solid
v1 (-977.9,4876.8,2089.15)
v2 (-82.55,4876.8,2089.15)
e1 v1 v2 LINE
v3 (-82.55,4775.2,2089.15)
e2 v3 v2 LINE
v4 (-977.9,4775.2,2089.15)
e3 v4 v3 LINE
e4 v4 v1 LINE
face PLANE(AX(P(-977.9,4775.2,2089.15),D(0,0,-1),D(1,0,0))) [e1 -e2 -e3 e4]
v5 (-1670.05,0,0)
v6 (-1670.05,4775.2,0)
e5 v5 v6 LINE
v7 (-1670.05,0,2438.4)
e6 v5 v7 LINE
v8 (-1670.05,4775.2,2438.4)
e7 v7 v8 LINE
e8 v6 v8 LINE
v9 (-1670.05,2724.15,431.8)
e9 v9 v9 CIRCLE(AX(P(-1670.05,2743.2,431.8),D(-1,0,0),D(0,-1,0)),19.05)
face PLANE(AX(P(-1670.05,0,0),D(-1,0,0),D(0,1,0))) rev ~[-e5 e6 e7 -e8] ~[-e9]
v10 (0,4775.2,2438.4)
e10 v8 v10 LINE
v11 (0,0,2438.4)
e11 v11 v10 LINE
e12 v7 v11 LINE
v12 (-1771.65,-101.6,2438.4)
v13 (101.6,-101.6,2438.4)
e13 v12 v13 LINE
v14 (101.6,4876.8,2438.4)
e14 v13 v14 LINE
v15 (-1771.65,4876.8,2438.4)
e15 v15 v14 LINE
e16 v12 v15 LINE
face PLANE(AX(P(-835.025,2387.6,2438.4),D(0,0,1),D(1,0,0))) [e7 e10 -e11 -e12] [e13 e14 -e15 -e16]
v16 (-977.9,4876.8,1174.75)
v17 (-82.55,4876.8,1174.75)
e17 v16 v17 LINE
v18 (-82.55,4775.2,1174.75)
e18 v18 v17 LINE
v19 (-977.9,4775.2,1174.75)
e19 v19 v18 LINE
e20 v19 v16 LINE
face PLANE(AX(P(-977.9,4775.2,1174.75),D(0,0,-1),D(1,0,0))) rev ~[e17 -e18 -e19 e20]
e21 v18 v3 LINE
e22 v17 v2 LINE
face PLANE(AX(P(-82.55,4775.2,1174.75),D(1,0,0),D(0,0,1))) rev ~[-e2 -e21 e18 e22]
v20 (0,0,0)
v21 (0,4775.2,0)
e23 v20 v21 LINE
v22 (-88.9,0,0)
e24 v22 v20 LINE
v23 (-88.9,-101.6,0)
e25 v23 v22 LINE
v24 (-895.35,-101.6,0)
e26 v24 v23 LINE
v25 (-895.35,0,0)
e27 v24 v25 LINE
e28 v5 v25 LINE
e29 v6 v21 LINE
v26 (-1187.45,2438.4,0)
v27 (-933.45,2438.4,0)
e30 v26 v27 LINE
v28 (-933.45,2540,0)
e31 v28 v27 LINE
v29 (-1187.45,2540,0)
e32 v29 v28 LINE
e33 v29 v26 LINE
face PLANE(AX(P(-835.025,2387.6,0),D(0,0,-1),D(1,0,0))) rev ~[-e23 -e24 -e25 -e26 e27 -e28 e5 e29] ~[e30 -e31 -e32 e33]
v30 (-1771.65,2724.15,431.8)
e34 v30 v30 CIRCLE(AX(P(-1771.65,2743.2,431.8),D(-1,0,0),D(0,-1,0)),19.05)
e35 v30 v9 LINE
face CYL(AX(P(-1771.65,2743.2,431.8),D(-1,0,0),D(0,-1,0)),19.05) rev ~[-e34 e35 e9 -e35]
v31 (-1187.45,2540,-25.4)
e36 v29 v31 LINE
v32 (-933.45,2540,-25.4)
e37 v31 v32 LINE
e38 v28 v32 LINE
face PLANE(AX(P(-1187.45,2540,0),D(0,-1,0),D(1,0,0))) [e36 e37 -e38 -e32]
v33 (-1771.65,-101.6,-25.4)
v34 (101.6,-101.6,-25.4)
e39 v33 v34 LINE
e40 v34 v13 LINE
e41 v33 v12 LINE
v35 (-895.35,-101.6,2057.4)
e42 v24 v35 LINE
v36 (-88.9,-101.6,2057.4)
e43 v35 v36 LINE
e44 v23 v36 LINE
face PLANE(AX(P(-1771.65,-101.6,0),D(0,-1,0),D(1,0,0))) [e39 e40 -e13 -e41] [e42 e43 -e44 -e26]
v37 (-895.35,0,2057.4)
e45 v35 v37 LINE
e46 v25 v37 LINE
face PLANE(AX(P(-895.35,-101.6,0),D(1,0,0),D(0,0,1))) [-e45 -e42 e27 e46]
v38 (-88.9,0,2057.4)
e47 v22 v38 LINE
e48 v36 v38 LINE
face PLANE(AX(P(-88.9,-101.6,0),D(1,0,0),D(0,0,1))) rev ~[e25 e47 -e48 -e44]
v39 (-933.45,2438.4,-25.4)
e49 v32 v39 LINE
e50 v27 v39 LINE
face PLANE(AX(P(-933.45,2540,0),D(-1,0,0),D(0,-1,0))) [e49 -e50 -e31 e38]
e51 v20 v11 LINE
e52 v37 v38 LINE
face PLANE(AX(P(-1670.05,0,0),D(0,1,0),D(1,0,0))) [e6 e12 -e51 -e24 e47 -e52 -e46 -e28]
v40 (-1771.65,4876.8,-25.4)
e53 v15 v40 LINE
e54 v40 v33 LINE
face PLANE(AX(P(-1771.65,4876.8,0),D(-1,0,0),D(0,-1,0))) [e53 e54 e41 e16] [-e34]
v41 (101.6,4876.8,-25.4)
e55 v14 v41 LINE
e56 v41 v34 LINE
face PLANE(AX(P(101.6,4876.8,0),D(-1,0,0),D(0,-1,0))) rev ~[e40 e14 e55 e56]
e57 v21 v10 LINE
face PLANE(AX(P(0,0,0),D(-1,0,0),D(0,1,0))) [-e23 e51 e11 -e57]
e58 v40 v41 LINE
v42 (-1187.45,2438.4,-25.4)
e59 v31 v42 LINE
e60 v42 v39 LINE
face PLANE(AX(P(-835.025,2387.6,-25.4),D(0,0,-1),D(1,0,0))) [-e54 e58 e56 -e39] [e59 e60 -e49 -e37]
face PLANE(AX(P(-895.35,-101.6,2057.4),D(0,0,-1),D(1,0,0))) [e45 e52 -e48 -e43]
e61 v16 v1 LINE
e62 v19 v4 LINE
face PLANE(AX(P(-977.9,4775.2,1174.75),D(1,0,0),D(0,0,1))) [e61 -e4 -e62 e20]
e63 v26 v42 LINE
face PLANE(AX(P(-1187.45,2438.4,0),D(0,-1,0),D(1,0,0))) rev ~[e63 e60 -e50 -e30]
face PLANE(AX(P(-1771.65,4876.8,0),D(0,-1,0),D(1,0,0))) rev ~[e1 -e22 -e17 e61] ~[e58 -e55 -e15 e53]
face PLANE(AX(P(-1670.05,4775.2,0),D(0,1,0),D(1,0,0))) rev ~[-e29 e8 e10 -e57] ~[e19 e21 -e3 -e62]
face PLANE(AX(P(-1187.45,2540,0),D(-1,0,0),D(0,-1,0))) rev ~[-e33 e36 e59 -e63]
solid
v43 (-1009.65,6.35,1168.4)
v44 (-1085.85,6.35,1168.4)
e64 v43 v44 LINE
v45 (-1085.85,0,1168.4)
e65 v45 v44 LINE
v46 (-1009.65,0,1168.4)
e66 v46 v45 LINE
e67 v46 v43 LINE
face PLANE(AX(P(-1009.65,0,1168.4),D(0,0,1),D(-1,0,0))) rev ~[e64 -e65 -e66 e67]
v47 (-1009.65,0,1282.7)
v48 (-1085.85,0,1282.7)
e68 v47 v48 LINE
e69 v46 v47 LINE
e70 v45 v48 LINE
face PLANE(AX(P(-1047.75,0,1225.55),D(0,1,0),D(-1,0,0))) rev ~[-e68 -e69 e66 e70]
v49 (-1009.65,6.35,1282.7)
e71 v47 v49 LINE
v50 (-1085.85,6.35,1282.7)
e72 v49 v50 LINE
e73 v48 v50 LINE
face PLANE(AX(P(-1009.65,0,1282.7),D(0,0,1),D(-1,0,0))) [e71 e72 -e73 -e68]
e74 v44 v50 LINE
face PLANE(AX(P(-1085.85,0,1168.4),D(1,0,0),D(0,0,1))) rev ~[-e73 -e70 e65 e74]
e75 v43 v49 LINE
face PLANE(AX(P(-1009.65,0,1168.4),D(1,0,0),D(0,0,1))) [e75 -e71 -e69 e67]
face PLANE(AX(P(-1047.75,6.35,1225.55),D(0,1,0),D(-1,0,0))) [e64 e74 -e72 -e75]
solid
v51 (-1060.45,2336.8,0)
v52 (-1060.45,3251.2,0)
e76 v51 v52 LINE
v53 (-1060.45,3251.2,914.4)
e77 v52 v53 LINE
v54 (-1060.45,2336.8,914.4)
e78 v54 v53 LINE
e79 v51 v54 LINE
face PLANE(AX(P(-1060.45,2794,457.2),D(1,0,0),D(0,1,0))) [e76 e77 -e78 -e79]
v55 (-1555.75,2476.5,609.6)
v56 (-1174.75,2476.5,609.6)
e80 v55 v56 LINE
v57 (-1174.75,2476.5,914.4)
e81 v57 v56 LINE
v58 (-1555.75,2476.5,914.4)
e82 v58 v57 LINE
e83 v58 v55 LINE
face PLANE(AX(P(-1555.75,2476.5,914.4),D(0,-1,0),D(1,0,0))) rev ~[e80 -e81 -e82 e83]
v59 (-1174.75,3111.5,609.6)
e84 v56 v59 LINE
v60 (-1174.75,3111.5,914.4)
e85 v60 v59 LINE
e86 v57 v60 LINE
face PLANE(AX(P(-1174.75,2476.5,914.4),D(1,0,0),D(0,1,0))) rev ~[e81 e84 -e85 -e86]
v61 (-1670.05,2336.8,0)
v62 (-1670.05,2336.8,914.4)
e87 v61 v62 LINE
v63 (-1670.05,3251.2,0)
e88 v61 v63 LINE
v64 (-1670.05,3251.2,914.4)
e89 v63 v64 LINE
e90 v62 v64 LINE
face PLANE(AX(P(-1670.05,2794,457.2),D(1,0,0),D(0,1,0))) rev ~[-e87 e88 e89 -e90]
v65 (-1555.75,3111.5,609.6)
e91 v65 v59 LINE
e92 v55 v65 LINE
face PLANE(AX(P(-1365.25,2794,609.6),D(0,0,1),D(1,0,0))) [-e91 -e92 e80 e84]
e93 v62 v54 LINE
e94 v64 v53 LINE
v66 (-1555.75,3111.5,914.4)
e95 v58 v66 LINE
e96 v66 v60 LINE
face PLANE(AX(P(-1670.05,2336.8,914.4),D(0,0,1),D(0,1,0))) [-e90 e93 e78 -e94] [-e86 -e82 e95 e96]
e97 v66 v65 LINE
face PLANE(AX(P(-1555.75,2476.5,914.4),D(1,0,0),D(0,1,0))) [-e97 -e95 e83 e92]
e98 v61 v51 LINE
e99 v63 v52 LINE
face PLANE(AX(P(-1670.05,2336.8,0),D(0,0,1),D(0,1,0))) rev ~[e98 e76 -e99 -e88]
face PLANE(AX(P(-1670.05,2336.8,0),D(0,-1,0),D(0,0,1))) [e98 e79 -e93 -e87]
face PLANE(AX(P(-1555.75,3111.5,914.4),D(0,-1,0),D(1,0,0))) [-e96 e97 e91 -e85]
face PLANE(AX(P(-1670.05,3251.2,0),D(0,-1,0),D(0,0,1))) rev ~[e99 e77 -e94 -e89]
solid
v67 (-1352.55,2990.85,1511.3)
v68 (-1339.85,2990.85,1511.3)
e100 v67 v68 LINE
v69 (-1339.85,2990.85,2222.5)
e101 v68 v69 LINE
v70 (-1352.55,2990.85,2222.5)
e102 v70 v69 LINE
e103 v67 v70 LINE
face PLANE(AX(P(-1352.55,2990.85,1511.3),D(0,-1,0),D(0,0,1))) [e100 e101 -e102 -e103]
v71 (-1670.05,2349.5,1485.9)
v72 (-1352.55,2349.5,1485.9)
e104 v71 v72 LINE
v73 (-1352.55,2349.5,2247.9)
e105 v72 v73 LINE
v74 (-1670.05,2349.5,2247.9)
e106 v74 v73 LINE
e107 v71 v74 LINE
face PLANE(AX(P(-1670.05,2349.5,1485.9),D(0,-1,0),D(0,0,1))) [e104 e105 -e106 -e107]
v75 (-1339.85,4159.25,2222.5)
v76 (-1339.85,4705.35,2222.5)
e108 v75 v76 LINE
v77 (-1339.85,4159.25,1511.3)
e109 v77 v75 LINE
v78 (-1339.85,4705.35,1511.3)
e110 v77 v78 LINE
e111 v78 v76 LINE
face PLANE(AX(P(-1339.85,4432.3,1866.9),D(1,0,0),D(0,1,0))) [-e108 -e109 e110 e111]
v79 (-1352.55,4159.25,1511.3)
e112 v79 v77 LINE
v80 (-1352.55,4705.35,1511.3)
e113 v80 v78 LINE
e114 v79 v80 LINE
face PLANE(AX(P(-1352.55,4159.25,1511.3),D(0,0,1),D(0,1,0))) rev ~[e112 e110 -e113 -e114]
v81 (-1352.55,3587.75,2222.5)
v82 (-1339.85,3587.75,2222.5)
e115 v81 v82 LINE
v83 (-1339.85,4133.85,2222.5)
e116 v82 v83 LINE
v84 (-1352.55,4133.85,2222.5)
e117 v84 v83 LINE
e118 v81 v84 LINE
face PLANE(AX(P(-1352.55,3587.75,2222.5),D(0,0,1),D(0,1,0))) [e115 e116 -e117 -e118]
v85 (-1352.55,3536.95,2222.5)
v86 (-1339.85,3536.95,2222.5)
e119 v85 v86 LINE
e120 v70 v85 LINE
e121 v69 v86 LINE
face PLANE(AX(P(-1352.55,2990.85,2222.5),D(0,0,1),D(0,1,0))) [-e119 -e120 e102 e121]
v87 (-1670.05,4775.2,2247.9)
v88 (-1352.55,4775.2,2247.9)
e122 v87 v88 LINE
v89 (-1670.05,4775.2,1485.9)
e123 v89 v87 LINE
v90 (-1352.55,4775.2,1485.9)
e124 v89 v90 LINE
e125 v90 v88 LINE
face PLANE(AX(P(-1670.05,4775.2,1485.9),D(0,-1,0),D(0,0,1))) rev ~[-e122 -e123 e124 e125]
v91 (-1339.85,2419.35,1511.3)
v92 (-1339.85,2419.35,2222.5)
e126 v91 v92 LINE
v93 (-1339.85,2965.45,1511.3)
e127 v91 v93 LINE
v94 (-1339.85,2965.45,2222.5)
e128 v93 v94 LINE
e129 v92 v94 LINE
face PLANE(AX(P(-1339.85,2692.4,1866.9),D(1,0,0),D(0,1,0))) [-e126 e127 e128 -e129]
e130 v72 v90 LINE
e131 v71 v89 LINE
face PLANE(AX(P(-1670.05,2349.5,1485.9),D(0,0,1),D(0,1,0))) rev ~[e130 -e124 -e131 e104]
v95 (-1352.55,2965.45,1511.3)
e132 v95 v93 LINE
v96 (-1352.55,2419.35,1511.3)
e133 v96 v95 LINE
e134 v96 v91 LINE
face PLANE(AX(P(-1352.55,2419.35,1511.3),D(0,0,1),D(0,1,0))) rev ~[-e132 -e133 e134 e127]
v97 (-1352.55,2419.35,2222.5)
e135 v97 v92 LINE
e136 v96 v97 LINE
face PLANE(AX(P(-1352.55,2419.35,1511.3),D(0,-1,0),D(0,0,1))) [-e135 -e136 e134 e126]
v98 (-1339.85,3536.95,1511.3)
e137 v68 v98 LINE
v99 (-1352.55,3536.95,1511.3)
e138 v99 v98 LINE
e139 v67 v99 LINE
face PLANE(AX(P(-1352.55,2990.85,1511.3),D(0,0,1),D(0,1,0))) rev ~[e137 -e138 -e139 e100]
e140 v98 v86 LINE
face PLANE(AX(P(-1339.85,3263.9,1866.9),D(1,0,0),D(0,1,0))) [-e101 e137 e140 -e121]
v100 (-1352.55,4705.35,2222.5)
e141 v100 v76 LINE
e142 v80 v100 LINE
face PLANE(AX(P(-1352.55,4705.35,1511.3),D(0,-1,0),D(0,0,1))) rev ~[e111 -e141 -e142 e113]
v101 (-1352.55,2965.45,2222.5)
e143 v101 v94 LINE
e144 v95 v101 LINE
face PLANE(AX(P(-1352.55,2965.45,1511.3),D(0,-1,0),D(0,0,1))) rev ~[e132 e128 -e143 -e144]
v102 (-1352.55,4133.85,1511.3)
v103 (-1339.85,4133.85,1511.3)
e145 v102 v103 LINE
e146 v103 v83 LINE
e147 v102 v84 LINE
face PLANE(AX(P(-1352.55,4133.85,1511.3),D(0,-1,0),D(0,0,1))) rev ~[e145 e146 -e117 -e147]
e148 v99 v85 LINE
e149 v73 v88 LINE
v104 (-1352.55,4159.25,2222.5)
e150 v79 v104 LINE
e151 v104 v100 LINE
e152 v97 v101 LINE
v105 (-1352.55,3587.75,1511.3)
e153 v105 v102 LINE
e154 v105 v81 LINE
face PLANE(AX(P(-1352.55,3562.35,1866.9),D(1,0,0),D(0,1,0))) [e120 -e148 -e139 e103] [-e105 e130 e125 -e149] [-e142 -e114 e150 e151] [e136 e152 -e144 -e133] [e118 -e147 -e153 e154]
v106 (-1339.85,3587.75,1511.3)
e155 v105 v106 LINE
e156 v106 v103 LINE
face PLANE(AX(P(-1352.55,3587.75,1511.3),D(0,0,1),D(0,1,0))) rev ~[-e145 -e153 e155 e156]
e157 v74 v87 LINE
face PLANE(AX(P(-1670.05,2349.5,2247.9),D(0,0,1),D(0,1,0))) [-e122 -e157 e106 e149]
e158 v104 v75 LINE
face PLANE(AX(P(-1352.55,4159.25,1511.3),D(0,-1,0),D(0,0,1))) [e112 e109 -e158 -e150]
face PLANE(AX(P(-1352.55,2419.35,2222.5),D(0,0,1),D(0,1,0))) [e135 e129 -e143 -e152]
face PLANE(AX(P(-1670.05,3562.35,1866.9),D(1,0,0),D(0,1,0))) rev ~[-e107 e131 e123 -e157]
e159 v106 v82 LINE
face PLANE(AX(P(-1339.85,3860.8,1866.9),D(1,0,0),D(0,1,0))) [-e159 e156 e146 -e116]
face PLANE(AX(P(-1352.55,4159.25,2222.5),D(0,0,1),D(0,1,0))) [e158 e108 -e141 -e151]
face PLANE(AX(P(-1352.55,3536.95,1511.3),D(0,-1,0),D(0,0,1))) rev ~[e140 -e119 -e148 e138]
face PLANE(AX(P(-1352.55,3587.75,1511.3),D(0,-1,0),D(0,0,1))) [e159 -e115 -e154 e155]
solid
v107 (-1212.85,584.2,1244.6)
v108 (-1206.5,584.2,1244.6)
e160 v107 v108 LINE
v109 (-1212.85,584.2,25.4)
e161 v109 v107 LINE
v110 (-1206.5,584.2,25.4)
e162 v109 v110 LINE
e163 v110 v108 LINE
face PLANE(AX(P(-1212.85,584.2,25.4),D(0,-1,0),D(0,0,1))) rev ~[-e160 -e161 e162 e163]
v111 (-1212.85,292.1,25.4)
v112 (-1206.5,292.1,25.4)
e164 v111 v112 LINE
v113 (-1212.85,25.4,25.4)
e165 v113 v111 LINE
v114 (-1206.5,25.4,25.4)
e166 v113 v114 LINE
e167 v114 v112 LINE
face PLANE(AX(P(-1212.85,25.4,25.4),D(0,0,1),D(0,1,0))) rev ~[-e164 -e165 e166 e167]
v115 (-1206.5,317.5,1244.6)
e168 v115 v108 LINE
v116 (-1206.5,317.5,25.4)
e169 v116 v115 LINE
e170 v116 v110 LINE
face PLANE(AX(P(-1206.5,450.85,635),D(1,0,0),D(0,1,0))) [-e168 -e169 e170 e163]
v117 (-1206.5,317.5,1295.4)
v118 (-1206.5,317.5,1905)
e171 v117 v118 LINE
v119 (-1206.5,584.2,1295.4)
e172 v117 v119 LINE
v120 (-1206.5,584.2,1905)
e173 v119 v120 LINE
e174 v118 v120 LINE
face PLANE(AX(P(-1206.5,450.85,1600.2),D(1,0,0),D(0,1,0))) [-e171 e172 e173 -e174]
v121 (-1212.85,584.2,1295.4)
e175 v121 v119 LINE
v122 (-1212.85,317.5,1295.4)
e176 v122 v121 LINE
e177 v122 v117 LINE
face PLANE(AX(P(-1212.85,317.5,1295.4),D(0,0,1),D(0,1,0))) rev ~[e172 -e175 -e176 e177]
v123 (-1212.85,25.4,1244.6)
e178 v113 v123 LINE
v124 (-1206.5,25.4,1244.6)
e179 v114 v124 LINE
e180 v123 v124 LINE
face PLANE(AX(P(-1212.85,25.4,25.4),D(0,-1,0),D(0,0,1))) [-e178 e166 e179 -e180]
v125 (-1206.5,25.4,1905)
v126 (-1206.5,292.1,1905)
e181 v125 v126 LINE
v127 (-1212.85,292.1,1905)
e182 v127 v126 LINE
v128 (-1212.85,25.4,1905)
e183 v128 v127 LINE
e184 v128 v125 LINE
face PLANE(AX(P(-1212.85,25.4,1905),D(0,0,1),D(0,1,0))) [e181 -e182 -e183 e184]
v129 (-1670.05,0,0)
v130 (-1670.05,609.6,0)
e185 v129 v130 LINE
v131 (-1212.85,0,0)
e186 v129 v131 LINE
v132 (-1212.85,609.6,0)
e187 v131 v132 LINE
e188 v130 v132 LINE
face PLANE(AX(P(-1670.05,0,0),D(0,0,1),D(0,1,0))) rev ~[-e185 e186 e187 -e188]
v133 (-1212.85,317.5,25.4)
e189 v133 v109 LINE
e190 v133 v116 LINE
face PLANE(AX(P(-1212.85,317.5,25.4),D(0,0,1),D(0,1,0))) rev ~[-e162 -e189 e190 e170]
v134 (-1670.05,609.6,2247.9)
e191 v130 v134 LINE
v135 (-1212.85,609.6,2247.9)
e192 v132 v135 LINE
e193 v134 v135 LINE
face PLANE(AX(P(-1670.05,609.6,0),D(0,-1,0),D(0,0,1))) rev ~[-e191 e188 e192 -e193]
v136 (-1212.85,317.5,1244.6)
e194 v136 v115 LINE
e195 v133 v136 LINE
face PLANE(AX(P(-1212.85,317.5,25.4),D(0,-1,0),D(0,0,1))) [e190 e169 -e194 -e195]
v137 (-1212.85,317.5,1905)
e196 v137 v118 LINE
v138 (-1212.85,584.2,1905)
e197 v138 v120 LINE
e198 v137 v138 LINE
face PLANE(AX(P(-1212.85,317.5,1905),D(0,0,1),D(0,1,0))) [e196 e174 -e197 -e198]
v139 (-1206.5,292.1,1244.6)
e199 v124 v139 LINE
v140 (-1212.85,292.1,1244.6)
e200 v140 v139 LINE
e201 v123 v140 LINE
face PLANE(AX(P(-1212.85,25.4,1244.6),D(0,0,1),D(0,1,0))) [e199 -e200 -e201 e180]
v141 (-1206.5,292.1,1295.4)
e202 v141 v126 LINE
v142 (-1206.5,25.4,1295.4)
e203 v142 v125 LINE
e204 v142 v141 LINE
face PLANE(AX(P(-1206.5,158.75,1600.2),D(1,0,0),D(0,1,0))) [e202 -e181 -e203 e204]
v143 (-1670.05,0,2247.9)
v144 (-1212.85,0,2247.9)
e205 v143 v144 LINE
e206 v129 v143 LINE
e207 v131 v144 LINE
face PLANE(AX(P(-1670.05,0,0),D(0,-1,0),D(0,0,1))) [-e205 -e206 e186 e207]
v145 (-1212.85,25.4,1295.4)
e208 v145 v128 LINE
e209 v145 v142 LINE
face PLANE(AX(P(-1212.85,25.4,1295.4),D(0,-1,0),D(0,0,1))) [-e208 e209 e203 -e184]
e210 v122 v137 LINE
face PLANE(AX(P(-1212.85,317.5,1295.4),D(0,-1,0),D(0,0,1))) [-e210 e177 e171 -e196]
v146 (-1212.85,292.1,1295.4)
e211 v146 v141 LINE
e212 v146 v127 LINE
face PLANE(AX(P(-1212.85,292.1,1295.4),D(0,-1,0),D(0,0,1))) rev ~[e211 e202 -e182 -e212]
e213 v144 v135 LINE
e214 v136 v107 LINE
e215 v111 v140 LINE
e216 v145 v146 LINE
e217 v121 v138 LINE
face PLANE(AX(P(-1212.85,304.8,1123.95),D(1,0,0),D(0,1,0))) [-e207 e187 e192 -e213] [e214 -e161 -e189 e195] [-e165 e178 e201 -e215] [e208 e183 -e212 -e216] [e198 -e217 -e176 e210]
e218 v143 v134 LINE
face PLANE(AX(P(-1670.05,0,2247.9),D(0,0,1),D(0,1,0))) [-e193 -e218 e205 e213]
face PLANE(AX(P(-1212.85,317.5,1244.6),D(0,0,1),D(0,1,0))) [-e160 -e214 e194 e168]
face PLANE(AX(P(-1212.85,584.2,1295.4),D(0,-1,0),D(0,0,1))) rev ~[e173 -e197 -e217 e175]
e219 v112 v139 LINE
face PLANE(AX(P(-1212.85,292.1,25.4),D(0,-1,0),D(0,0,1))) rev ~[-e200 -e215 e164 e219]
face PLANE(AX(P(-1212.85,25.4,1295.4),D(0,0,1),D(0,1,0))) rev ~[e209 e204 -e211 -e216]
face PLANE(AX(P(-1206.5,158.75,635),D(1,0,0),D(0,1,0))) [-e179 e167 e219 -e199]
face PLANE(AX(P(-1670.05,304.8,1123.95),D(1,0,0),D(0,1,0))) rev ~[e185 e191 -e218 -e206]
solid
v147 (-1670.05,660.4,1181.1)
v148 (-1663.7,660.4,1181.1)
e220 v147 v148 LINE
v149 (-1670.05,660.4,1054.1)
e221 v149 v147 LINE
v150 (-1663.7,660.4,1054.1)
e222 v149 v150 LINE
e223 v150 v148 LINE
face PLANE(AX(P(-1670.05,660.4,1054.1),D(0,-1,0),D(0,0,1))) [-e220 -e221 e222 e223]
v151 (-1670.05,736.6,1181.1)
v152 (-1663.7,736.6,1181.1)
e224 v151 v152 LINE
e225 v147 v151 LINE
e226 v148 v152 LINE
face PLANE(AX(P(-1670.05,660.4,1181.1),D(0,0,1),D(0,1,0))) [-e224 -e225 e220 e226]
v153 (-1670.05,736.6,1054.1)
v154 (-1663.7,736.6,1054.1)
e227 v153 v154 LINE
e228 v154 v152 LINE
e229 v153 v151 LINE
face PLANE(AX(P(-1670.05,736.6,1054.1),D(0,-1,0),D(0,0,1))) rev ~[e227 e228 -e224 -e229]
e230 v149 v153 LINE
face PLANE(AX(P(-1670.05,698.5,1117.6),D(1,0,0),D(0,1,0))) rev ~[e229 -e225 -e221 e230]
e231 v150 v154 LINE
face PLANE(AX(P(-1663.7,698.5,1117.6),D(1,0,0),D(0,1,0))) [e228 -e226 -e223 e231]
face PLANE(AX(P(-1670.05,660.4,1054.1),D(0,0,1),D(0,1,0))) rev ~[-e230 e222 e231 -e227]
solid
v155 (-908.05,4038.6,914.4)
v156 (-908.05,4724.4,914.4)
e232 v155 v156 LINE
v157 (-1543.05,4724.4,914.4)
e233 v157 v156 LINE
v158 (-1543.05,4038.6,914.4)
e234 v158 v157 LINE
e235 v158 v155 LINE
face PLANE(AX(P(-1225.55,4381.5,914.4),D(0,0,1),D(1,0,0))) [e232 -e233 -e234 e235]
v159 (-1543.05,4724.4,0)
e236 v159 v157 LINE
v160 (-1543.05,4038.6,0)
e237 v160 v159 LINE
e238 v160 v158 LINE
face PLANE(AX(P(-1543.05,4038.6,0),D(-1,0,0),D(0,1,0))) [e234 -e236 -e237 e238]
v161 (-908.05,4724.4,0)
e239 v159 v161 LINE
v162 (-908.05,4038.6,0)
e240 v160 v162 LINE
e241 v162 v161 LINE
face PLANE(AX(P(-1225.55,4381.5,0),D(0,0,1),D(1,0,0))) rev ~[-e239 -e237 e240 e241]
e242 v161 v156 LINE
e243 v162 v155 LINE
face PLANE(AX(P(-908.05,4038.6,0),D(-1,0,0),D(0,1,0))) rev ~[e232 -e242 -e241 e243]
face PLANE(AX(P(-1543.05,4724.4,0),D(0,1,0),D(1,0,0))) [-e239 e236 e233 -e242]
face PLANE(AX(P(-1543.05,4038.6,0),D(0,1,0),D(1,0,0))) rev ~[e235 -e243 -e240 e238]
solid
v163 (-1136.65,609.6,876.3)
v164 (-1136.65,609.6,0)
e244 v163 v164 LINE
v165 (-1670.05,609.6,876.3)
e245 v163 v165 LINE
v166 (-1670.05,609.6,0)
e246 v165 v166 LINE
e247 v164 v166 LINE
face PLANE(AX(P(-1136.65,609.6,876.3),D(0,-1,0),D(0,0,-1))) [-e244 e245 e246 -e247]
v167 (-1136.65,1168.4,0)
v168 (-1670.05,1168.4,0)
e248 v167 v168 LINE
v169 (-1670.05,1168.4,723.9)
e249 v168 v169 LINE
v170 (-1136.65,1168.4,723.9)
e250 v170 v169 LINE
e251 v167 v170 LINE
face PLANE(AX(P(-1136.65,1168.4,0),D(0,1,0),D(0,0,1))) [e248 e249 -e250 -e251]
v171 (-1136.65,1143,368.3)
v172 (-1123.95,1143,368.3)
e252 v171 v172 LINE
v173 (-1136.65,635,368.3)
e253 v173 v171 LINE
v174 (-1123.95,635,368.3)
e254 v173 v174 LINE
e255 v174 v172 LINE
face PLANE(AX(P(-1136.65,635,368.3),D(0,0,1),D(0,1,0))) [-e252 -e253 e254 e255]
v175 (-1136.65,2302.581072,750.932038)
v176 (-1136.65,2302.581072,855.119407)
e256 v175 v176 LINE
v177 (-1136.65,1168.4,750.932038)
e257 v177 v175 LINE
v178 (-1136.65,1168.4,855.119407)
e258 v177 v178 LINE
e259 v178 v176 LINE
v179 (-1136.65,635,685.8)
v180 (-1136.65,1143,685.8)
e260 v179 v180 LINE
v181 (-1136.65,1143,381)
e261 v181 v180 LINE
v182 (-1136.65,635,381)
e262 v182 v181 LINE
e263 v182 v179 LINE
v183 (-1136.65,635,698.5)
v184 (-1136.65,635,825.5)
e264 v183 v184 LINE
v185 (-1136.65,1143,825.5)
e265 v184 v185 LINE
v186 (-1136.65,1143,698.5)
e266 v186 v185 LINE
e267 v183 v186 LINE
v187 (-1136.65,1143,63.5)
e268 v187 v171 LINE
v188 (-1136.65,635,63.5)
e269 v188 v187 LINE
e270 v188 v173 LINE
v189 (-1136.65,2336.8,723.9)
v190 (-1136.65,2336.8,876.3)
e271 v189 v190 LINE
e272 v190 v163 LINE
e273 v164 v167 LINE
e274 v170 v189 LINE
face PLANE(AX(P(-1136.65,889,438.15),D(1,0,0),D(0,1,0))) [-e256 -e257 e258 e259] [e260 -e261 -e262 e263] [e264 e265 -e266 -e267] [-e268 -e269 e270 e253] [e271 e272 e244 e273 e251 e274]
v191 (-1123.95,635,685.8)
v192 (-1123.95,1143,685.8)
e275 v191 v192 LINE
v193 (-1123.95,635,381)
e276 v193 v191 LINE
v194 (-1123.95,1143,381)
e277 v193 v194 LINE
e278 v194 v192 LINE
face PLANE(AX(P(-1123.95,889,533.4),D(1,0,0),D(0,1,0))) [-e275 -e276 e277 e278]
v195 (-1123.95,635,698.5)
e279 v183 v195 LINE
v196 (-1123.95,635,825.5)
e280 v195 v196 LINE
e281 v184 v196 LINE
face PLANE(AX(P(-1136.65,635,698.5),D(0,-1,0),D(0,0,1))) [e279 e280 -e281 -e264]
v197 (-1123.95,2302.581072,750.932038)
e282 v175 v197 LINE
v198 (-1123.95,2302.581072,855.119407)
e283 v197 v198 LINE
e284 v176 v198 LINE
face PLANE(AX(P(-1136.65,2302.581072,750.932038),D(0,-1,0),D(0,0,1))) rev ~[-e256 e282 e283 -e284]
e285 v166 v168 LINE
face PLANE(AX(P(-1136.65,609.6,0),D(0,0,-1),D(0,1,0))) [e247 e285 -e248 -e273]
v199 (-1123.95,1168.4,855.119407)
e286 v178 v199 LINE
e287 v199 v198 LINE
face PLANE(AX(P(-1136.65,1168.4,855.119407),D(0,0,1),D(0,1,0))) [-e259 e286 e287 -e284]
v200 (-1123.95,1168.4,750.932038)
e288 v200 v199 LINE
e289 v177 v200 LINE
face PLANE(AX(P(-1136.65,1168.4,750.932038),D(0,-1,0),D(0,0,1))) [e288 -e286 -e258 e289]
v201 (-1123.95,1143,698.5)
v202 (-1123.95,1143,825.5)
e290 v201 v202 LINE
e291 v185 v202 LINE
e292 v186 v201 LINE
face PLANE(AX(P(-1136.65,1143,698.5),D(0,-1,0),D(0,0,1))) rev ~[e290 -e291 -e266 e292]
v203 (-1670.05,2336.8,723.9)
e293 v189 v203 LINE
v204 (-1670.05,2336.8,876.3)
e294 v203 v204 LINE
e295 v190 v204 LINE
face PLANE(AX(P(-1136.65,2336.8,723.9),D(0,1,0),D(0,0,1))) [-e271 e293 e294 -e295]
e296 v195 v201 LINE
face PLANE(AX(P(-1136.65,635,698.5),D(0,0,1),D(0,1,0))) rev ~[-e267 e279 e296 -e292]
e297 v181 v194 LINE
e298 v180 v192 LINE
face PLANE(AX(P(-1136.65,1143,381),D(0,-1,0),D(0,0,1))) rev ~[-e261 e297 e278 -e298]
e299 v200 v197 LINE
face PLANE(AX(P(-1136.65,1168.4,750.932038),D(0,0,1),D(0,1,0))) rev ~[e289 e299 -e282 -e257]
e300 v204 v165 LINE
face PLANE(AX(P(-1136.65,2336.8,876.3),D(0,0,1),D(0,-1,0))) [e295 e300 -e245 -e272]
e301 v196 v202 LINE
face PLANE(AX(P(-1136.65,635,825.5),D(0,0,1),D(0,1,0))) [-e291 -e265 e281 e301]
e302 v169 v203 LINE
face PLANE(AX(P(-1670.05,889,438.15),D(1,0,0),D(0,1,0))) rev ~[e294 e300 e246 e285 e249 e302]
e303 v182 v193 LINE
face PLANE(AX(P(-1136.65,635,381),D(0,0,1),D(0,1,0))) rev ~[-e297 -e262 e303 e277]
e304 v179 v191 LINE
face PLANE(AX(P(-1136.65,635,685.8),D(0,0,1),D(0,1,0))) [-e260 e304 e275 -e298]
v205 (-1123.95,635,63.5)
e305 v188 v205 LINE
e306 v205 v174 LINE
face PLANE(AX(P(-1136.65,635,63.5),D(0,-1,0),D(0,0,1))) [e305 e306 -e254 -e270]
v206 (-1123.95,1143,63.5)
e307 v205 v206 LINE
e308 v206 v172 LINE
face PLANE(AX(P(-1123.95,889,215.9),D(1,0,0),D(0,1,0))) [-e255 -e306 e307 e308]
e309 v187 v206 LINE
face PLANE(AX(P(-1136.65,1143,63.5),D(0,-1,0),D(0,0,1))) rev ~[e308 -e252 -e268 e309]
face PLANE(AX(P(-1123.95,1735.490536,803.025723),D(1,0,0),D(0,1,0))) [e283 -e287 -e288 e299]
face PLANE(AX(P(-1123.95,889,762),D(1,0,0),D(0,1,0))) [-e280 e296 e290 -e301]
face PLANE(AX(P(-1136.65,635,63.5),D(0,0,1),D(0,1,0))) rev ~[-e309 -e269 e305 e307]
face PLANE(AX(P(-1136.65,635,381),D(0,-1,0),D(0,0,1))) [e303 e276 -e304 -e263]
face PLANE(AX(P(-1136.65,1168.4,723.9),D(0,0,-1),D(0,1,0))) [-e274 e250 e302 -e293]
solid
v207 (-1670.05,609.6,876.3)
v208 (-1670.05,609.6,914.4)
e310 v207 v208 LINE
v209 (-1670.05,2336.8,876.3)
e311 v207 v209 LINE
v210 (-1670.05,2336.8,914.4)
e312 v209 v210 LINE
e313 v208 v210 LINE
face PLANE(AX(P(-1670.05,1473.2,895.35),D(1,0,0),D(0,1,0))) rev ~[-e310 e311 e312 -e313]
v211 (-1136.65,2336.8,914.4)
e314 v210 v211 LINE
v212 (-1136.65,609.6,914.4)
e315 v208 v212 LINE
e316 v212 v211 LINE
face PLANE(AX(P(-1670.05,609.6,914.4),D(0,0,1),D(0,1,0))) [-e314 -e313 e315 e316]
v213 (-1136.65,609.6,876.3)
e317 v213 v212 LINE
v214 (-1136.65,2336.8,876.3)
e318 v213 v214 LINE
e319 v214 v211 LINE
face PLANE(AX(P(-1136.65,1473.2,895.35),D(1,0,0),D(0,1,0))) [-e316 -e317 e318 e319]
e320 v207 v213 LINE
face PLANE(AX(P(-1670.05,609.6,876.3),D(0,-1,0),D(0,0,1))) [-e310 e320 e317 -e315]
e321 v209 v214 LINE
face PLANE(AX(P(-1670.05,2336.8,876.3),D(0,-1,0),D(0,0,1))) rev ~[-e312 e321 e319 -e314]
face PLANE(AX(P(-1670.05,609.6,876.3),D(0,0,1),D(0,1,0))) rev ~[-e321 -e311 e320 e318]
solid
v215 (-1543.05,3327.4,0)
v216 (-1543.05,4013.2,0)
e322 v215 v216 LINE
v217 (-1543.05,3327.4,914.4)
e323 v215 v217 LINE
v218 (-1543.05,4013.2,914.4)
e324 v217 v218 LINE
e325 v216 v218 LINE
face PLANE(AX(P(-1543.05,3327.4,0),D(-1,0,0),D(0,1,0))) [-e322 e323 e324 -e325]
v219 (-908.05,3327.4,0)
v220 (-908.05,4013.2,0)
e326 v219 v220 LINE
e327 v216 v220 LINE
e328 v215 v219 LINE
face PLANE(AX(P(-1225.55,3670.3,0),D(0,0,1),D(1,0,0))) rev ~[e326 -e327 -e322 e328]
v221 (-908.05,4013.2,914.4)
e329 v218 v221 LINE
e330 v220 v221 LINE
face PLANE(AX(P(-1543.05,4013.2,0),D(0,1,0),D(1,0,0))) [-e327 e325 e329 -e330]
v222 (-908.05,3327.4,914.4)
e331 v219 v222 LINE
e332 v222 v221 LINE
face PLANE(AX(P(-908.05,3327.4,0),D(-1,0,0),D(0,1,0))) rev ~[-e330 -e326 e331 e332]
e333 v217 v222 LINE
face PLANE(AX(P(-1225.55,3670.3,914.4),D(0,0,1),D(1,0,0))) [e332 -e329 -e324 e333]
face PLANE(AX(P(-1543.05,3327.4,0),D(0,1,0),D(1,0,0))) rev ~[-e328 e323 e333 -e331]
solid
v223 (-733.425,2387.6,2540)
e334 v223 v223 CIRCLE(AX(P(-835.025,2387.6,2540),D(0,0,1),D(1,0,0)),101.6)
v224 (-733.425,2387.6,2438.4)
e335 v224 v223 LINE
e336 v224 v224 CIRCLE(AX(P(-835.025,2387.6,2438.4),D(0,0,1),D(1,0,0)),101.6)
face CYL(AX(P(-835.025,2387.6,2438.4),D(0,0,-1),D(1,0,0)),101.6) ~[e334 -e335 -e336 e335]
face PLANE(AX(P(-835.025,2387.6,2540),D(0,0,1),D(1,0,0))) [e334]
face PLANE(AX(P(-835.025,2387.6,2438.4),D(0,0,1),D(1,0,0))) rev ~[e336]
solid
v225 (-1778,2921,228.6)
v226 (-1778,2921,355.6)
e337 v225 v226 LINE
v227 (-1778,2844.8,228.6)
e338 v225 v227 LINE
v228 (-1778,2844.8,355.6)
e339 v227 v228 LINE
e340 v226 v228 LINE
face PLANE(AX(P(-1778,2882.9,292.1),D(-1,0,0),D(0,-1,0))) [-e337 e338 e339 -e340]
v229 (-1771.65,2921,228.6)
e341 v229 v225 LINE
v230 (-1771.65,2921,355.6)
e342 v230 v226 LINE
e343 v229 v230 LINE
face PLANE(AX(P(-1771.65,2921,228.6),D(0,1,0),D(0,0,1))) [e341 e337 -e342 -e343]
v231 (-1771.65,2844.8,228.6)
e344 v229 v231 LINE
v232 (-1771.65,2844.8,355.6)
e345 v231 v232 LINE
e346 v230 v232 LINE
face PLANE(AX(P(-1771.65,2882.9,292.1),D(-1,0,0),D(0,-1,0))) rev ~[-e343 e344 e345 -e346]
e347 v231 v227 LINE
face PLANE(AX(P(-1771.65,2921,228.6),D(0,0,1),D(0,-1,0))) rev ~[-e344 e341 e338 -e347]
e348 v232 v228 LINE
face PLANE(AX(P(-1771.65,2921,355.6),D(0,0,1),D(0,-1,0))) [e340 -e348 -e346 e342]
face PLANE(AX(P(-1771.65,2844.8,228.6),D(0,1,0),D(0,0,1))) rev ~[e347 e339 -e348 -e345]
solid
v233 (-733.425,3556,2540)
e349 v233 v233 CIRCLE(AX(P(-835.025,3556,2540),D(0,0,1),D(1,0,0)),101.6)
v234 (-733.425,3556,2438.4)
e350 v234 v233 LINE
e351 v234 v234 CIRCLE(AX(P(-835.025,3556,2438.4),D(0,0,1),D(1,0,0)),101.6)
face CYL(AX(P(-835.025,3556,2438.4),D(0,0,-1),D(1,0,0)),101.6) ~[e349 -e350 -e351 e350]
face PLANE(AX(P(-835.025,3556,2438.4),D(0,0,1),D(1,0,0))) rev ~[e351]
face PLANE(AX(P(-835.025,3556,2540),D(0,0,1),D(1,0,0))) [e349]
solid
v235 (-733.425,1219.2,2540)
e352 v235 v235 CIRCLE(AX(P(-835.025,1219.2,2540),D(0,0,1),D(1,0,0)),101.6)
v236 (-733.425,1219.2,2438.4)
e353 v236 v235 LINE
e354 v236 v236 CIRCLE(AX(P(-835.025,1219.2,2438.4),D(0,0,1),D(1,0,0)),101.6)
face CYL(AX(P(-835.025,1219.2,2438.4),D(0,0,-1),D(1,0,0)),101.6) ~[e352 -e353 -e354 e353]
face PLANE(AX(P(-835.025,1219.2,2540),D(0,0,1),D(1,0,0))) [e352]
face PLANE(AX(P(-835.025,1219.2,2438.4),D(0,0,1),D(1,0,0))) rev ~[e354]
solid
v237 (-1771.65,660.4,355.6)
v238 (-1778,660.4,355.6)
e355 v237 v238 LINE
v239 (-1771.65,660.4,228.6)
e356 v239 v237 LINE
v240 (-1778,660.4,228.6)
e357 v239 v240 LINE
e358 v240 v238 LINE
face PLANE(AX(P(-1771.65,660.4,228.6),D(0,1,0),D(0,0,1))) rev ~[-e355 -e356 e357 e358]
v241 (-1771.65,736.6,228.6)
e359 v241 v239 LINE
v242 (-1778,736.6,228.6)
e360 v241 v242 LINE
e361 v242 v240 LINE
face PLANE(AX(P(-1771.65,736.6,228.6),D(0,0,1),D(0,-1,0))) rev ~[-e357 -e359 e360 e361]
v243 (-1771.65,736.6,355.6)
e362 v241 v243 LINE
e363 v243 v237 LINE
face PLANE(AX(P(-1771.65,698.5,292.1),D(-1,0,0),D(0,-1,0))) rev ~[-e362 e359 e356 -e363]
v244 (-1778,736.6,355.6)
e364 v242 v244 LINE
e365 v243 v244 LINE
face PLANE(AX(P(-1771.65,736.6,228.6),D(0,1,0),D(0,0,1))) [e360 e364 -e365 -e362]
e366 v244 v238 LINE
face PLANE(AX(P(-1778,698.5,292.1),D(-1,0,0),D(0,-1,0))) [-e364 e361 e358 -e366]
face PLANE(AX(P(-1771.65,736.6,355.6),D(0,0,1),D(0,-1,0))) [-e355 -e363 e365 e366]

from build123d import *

# Parameters (mm, degrees)
F0_W      = 1873.25
F0_H      = 4978.4
F0_W_2    = 1670.05
F0_H_2    = 4775.2
F1_DEPTH  = 2438.4
F2_W      = 806.45
F2_H      = 2057.4
F3_DEPTH  = 101.6
F4_W      = 895.35
F4_H      = 914.4
F5_DEPTH  = 101.6
F6_W      = 1873.25
F6_H      = 4978.4
F6_W_2    = 254
F6_H_2    = 101.6
F7_DEPTH  = 25.4
F8_W      = 635
F8_H      = 685.8
F9_DEPTH  = 914.4
F10_W     = 2425.7
F10_H     = 762
F11_DEPTH = 317.5
F13_W     = 76.2
F13_H     = 114.3
F14_DEPTH = 6.35
F15_R     = 101.6
F16_DEPTH = 101.6
F17_W     = 609.6
F17_H     = 2247.9
F18_DEPTH = 457.2
F19_W     = 914.4
F19_H     = 914.4
F20_DEPTH = 609.6
F21_W     = 1727.2
F21_H     = 38.1
F22_DEPTH = 533.4
F23_W     = 1168.4
F23_H     = 152.4
F24_DEPTH = 533.4
F25_W     = 508
F25_H     = 304.8
F25_H_2   = 127
F25_W_2   = 1134.1810718536
F25_H_3   = 104.1873693466
F26_DEPTH = 12.7
F12_R     = 19.05
F27_DEPTH = 101.6
F28_W     = 266.7
F28_H     = 1219.2
F28_H_2   = 609.6
F29_DEPTH = 6.35
F30_W     = 546.1
F30_H     = 711.2
F31_DEPTH = 12.7
F32_W     = 76.2
F32_H     = 127
F33_DEPTH = 6.35
F34_W     = 76.2
F34_H     = 127
F35_DEPTH = 6.35
F36_W     = 381
F36_H     = 635
F37_DEPTH = 304.8


# Not quite as in the source:
# - a feature names something its author has since deleted; it is built from what else it names


with BuildPart() as f1:
    # F0 (on Top) → F1 (new body)
    with BuildSketch(Plane.XY):
        with Locations((-835.025, 2387.6)):
            Rectangle(F0_W, F0_H)
        with Locations((-835.025, 2387.6)):
            Rectangle(F0_W_2, F0_H_2, mode=Mode.SUBTRACT)
    extrude(amount=F1_DEPTH)

    # F2 (on face) → F3 (cut, through all)
    with BuildSketch(Plane.XZ.offset(101.6)):
        with Locations((-492.125, 1028.7)):
            Rectangle(F2_W, F2_H)
    extrude(amount=-F3_DEPTH, mode=Mode.SUBTRACT)

    # F4 (on face) → F5 (cut, through all)
    with BuildSketch(Plane.XZ.offset(-4775.2)):
        with Locations((-530.225, 1631.95)):
            Rectangle(F4_W, F4_H)
    extrude(amount=-F5_DEPTH, mode=Mode.SUBTRACT)

    # F6 (on face) → F7 (join)
    with BuildSketch(Plane(origin=(0, 0, 0), x_dir=(1, 0, 0), z_dir=(0, 0, -1))):
        with Locations((-835.025, -2387.6)):
            Rectangle(F6_W, F6_H)
        with Locations((-1060.45, -2489.2)):
            Rectangle(F6_W_2, F6_H_2, mode=Mode.SUBTRACT)
    extrude(amount=F7_DEPTH)

    # F12 (on face) → F27 (cut, through all)
    with BuildSketch(Plane(origin=(-1771.65, 0, 0), x_dir=(0, -1, 0), z_dir=(-1, 0, 0))):
        with Locations((-2743.2, 431.8)):
            Circle(F12_R)
    extrude(amount=-F27_DEPTH, mode=Mode.SUBTRACT)


with BuildPart() as f9:
    # F8 (on face) → F9 (new body)
    with BuildSketch(Plane.XY):
        with Locations((-1225.55, 4381.5)):
            Rectangle(F8_W, F8_H)
    extrude(amount=F9_DEPTH)


with BuildPart() as f9b:
    # F8 (on face) → F9, piece 2 (new body)
    with BuildSketch(Plane.XY):
        with Locations((-1225.55, 3670.3)):
            Rectangle(F8_W, F8_H)
    extrude(amount=F9_DEPTH)


with BuildPart() as f11:
    # F10 (on face) → F11 (new body)
    with BuildSketch(Plane.YZ.offset(-1670.05)):
        with Locations((3562.35, 1866.9)):
            Rectangle(F10_W, F10_H)
    extrude(amount=F11_DEPTH)

    # F30 (on face) → F31 (join)
    with BuildSketch(Plane.YZ.offset(-1352.55)):
        with Locations((2692.4, 1866.9)):
            Rectangle(F30_W, F30_H)
        with Locations((3263.9, 1866.9)):
            Rectangle(F30_W, F30_H)
        with Locations((3860.8, 1866.9)):
            Rectangle(F30_W, F30_H)
        with Locations((4432.3, 1866.9)):
            Rectangle(F30_W, F30_H)
    extrude(amount=F31_DEPTH)


with BuildPart() as f14:
    # F13 (on face) → F14 (new body)
    with BuildSketch(Plane(origin=(0, 0, 0), x_dir=(-1, 0, 0), z_dir=(0, 1, 0))):
        with Locations((1047.75, 1225.55)):
            Rectangle(F13_W, F13_H)
    extrude(amount=F14_DEPTH)


with BuildPart() as f16:
    # F15 (on face) → F16 (new body)
    with BuildSketch(Plane.XY.offset(2438.4)):
        with Locations((-835.025, 3556)):
            Circle(F15_R)
    extrude(amount=F16_DEPTH)


with BuildPart() as f16b:
    # F15 (on face) → F16, piece 2 (new body)
    with BuildSketch(Plane.XY.offset(2438.4)):
        with Locations((-835.025, 1219.2)):
            Circle(F15_R)
    extrude(amount=F16_DEPTH)


with BuildPart() as f16c:
    # F15 (on face) → F16, piece 3 (new body)
    with BuildSketch(Plane.XY.offset(2438.4)):
        with Locations((-835.025, 2387.6)):
            Circle(F15_R)
    extrude(amount=F16_DEPTH)


with BuildPart() as f18:
    # F17 (on face) → F18 (new body)
    with BuildSketch(Plane.YZ.offset(-1670.05)):
        with Locations((304.8, 1123.95)):
            Rectangle(F17_W, F17_H)
    extrude(amount=F18_DEPTH)

    # F28 (on face) → F29 (join)
    with BuildSketch(Plane.YZ.offset(-1212.85)):
        with Locations((158.75, 635)):
            Rectangle(F28_W, F28_H)
        with Locations((450.85, 635)):
            Rectangle(F28_W, F28_H)
        with Locations((158.75, 1600.2)):
            Rectangle(F28_W, F28_H_2)
        with Locations((450.85, 1600.2)):
            Rectangle(F28_W, F28_H_2)
    extrude(amount=F29_DEPTH)


with BuildPart() as f20:
    # F19 (on face) → F20 (new body)
    with BuildSketch(Plane.YZ.offset(-1670.05)):
        with Locations((2794, 457.2)):
            Rectangle(F19_W, F19_H)
    extrude(amount=F20_DEPTH)

    # F36 (on face) → F37 (cut)
    with BuildSketch(Plane.XY.offset(914.4)):
        with Locations((-1365.25, 2794)):
            Rectangle(F36_W, F36_H)
    extrude(amount=-F37_DEPTH, mode=Mode.SUBTRACT)


with BuildPart() as f22:
    # F21 (on face) → F22 (new body)
    with BuildSketch(Plane.YZ.offset(-1670.05)):
        with Locations((1473.2, 895.35)):
            Rectangle(F21_W, F21_H)
    extrude(amount=F22_DEPTH)


with BuildPart() as f24:
    # F23 (on face) → F24 (new body, through all)
    with BuildSketch(Plane.YZ.offset(-1136.65)):
        Polygon((1168.4, 876.3), (609.6, 876.3), (609.6, 0), (1168.4, 0), (1168.4, 723.9), align=None)
        with Locations((1752.6, 800.1)):
            Rectangle(F23_W, F23_H)
    extrude(amount=-F24_DEPTH)

    # F25 (on face) → F26 (join)
    with BuildSketch(Plane.YZ.offset(-1136.65)):
        with Locations((889, 215.9)):
            Rectangle(F25_W, F25_H)
        with Locations((889, 533.4)):
            Rectangle(F25_W, F25_H)
        with Locations((889, 762)):
            Rectangle(F25_W, F25_H_2)
        with Locations((1735.4905359268, 803.0257225037)):
            Rectangle(F25_W_2, F25_H_3)
    extrude(amount=F26_DEPTH)


with BuildPart() as f33:
    # F32 (on face) → F33 (new body)
    with BuildSketch(Plane(origin=(-1771.65, 0, 0), x_dir=(0, -1, 0), z_dir=(-1, 0, 0))):
        with Locations((-698.5, 292.1)):
            Rectangle(F32_W, F32_H)
    extrude(amount=F33_DEPTH)


with BuildPart() as f33b:
    # F32 (on face) → F33, piece 2 (new body)
    with BuildSketch(Plane(origin=(-1771.65, 0, 0), x_dir=(0, -1, 0), z_dir=(-1, 0, 0))):
        with Locations((-2882.9, 292.1)):
            Rectangle(F32_W, F32_H)
    extrude(amount=F33_DEPTH)


with BuildPart() as f35:
    # F34 (on face) → F35 (new body)
    with BuildSketch(Plane.YZ.offset(-1670.05)):
        with Locations((698.5, 1117.6)):
            Rectangle(F34_W, F34_H)
    extrude(amount=F35_DEPTH)


solid = Compound([f1.part, f9.part, f9b.part, f11.part, f14.part, f16.part, f16b.part, f16c.part, f18.part, f20.part, f22.part, f24.part, f33.part, f33b.part, f35.part])
